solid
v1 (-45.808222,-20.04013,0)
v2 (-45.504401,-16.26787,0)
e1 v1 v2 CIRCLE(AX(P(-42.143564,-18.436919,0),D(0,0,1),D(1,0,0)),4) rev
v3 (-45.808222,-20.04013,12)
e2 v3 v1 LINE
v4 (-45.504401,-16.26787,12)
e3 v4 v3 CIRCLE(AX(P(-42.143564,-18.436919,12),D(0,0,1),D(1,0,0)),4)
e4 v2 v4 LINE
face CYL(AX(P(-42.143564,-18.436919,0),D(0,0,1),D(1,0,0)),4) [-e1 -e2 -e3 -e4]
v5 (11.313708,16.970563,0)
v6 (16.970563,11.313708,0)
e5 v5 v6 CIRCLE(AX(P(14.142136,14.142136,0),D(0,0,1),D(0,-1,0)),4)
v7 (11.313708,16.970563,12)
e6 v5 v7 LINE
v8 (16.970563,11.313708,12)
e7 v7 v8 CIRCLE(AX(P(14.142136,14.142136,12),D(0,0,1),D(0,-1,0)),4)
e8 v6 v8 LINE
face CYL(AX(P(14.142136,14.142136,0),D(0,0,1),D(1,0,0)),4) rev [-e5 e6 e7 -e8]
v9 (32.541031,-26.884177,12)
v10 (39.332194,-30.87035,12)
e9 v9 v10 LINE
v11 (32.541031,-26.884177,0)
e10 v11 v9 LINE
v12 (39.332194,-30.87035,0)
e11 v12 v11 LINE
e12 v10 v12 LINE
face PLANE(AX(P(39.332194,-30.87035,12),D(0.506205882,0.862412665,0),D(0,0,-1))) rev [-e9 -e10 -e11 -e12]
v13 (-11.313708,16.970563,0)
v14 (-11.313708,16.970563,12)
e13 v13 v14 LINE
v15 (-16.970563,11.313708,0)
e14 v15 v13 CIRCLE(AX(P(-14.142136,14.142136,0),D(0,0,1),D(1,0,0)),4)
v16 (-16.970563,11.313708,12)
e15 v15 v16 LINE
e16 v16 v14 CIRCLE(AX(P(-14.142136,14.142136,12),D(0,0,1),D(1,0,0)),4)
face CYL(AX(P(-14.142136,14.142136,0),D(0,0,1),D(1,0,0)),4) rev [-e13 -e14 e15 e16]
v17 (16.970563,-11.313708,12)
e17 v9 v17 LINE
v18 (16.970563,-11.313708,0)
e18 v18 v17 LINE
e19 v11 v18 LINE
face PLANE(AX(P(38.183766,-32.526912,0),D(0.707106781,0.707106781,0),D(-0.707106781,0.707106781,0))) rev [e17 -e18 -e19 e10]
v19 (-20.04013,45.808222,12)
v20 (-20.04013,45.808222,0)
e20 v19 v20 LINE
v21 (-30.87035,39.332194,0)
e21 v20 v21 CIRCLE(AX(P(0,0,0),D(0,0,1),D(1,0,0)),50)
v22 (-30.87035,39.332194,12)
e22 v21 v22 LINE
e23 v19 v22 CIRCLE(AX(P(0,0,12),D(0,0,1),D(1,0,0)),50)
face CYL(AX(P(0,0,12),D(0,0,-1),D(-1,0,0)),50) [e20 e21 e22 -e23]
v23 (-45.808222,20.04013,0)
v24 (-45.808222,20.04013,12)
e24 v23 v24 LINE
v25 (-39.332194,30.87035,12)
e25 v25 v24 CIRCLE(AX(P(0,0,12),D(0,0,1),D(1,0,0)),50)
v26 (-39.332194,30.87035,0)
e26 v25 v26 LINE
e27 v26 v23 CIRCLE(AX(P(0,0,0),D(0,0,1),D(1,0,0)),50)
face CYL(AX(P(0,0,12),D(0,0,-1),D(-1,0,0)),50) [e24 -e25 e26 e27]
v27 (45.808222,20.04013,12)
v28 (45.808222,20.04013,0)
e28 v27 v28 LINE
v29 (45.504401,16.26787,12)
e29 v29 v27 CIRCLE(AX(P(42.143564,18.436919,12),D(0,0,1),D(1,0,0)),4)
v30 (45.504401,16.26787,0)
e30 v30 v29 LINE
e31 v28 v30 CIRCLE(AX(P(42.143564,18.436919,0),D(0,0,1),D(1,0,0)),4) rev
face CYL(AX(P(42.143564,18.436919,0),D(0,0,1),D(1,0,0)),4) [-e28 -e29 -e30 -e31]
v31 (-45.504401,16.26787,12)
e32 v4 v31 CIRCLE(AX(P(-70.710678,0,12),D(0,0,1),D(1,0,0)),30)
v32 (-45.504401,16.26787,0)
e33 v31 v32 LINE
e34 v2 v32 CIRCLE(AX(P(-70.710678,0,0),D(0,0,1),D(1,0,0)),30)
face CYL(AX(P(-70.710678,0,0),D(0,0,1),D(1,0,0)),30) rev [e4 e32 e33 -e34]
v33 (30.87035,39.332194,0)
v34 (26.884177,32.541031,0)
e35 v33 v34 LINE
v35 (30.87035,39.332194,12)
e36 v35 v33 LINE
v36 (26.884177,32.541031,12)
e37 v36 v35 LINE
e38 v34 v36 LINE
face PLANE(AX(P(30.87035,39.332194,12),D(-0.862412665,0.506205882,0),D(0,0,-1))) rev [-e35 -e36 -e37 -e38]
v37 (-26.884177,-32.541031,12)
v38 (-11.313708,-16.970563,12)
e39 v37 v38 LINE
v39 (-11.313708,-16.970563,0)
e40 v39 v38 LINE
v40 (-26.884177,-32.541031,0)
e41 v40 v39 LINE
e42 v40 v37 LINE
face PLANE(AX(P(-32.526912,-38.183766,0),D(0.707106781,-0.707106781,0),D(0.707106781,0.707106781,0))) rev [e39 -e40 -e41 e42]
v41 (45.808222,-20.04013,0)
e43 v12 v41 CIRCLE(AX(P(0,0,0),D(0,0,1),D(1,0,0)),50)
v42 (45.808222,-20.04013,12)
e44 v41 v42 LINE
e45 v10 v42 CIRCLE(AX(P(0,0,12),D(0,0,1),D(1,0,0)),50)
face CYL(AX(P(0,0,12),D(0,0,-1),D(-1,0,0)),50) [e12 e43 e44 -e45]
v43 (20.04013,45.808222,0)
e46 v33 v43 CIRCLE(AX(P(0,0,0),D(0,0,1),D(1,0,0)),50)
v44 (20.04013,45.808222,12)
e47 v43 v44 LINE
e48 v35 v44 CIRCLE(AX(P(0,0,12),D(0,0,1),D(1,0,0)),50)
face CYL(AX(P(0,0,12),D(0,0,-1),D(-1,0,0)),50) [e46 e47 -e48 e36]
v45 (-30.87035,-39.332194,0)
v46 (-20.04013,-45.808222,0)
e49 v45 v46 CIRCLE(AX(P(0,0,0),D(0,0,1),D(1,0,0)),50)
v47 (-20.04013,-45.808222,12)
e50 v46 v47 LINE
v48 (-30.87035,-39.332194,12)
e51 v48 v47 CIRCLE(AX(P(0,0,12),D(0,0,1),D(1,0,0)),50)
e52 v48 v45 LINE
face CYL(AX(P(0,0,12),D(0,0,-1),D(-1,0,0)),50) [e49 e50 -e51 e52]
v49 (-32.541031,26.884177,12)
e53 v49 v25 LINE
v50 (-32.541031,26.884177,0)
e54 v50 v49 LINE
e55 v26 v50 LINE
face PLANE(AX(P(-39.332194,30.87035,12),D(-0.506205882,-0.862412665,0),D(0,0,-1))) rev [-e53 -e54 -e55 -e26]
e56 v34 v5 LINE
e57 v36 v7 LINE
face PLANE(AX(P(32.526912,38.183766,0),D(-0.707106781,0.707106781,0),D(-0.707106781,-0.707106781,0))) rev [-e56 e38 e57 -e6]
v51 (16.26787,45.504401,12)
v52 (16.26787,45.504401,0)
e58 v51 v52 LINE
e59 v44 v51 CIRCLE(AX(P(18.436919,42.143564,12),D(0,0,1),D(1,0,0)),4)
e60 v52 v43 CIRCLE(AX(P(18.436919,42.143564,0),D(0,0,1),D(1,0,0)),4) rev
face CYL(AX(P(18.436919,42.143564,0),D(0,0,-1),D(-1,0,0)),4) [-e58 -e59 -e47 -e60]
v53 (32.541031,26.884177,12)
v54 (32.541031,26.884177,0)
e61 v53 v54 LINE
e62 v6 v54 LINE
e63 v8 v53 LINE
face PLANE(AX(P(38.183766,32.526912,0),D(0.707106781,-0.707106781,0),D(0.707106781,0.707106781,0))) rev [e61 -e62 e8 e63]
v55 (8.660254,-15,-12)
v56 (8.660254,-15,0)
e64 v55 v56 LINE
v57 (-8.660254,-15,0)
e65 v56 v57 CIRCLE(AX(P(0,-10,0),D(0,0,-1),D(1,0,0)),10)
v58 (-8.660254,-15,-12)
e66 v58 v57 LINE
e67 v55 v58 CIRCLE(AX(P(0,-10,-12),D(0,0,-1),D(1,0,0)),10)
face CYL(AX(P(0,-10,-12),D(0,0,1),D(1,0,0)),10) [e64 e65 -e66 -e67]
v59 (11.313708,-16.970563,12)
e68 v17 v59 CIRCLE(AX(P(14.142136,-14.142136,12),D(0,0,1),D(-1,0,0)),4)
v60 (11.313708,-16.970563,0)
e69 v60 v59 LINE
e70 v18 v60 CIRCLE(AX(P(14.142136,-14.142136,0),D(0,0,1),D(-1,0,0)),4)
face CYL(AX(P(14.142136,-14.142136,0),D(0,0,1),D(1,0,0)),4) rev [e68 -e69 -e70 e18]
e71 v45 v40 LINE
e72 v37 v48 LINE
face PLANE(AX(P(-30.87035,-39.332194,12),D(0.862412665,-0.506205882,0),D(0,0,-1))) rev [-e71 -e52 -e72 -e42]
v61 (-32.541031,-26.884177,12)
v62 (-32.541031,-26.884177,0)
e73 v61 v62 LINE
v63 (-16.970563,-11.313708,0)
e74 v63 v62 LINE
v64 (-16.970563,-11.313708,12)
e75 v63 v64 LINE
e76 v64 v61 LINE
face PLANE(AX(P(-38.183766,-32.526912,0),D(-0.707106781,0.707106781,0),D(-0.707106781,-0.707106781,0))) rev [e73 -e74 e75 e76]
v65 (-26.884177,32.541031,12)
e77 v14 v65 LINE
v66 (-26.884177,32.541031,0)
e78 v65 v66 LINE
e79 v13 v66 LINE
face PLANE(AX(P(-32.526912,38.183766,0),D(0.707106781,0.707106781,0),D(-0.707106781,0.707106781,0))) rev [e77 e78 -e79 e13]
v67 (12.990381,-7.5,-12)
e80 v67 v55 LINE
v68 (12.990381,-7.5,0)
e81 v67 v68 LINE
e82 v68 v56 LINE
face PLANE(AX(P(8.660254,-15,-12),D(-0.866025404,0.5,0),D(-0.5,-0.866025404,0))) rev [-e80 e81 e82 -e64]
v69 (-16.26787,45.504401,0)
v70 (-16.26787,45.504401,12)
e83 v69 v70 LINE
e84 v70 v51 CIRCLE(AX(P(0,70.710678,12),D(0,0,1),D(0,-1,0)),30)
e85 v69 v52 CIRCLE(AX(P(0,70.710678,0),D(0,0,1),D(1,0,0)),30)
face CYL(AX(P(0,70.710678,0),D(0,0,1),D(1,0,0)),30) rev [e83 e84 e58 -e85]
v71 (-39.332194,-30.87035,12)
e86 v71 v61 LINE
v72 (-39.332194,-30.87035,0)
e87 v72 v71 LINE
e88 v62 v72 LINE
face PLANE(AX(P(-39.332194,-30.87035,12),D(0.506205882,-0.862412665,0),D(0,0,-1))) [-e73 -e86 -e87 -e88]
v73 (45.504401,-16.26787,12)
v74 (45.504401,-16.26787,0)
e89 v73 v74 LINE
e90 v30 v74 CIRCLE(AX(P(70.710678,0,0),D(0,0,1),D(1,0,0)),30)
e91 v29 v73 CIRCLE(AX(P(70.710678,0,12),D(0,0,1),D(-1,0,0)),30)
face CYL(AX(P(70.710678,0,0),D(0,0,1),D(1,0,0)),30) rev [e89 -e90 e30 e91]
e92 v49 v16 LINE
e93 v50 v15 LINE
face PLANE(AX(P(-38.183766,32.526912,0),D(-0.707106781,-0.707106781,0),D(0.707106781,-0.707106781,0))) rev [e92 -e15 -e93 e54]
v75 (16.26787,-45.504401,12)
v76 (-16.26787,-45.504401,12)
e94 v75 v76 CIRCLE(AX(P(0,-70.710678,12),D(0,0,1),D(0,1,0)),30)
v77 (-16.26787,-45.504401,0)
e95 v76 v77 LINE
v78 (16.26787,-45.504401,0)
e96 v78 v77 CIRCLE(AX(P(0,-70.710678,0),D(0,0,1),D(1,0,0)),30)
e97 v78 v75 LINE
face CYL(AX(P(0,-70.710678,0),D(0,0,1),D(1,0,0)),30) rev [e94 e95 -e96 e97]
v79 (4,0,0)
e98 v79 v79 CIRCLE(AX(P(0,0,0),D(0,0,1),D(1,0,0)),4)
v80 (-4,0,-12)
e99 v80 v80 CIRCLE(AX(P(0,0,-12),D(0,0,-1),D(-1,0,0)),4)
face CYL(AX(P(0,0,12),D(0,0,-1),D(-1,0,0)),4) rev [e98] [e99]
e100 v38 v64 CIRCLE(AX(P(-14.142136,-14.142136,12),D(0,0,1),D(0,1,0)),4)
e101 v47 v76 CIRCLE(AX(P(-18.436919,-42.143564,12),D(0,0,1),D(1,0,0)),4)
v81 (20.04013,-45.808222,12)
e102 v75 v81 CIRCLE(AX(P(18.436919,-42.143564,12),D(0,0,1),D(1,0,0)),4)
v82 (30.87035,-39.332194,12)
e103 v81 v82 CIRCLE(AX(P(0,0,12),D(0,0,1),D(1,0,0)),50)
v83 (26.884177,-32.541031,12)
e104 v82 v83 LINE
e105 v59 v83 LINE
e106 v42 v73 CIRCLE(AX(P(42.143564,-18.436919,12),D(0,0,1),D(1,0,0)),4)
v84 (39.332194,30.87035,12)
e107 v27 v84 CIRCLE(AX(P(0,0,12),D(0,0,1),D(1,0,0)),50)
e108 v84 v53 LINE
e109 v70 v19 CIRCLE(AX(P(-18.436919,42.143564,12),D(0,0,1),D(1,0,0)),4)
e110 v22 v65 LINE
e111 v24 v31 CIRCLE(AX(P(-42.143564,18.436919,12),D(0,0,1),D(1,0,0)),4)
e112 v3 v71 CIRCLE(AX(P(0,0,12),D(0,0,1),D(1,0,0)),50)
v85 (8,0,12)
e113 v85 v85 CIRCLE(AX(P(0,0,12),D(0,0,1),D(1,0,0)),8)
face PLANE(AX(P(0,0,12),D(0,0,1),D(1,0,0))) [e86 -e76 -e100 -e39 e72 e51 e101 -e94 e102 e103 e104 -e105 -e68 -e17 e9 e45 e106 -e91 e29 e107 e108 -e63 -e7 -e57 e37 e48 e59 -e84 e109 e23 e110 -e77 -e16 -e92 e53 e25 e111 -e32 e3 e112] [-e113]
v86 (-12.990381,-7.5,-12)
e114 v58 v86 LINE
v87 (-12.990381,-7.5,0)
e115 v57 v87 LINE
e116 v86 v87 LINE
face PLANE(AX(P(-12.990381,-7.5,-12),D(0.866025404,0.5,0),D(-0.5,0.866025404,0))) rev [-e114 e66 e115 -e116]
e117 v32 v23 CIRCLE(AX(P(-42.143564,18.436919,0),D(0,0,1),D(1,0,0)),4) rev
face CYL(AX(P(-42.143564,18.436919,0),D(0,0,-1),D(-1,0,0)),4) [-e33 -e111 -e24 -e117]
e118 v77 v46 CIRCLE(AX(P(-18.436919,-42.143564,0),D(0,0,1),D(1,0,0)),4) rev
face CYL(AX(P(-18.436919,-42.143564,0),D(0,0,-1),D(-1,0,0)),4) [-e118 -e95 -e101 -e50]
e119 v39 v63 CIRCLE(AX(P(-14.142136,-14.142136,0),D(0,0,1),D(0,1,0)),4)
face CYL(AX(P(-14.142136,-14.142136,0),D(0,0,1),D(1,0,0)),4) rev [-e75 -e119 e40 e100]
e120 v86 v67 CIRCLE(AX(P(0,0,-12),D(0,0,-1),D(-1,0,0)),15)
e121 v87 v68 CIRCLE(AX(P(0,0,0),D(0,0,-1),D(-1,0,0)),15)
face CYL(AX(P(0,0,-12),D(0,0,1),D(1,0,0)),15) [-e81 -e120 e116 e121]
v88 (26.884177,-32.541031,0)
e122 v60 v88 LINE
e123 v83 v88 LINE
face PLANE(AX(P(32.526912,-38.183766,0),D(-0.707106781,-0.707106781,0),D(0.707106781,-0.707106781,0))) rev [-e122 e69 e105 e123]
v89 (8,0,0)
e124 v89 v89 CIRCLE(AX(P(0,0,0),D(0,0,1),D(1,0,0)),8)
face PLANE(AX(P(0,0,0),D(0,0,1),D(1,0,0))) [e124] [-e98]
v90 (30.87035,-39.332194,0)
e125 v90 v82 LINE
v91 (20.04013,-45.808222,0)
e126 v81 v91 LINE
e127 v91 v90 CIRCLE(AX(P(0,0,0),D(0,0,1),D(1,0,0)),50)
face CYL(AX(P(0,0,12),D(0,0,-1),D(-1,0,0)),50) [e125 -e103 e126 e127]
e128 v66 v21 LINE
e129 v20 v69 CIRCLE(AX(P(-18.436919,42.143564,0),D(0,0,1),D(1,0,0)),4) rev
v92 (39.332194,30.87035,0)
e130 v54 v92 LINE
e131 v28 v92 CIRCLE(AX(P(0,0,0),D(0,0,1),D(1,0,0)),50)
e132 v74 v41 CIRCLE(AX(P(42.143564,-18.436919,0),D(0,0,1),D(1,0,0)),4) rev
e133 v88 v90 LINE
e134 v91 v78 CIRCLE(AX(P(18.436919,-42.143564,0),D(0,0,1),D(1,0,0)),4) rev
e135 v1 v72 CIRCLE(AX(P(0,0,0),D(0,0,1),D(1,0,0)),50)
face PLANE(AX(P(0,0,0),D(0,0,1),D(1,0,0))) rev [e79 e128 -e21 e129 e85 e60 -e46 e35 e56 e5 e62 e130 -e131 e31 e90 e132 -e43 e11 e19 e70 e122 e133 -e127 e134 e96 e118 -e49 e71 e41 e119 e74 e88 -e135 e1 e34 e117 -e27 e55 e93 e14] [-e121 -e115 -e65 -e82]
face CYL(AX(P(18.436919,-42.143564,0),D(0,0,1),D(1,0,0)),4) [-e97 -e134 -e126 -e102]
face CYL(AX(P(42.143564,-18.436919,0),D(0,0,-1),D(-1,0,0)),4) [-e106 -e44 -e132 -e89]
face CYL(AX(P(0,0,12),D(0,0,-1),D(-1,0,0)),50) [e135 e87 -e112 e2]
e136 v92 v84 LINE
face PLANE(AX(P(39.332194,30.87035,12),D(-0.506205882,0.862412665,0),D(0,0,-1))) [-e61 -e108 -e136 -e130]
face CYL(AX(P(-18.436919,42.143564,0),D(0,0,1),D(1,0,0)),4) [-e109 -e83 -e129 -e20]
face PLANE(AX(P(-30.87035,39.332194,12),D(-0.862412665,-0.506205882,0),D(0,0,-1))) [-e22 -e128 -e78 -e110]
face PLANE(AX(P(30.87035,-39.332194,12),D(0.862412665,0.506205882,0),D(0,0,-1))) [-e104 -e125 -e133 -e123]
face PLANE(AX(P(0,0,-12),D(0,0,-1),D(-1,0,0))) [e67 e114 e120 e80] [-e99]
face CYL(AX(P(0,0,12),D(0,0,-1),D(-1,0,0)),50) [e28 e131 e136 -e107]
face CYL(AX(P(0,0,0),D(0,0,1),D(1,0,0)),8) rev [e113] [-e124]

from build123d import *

# Parameters (mm, degrees)
SKETCH1_R           = 50
SKETCH1_R_2         = 4
BOSS_EXTRUDE1_DEPTH = 12
SKETCH2_R           = 30
CUT_EXTRUDE1_DEPTH  = 72.721684308
CUT_EXTRUDE2_DEPTH  = 72.721684308
CHAMFER1_SIZE       = 7.819775181
CIRPATTERN1_DEPTH   = 12
FILLET1_R           = 4
BOSS_EXTRUDE2_START = 12
SKETCH4_R           = 4
BOSS_EXTRUDE2_DEPTH = 12
SKETCH5_R           = 8
CUT_EXTRUDE3_DEPTH  = 12


with BuildPart() as part:
    # Sketch1 → Boss-Extrude1 (new body)
    with BuildSketch(Plane.XY):
        Circle(SKETCH1_R)
        Circle(SKETCH1_R_2, mode=Mode.SUBTRACT)
    extrude(amount=BOSS_EXTRUDE1_DEPTH)

    # Sketch2 → Cut-Extrude1 (cut, through all)
    with BuildSketch(Plane.XY.offset(12)):
        with Locations((-70.710678119, 0)):
            Circle(SKETCH2_R)
    extrude(amount=-CUT_EXTRUDE1_DEPTH, mode=Mode.SUBTRACT)

    # Sketch3 → Cut-Extrude2 (cut, through all)
    with BuildSketch(Plane.XY.offset(12)):
        with BuildLine():
            Line((-32.526911935, 38.183766184), (-11.313708499, 16.970562748))
            ThreePointArc((-11.313708499, 16.970562748), (-11.313708499, 11.313708499), (-16.970562748, 11.313708499))
            Line((-16.970562748, 11.313708499), (-38.183766184, 32.526911935))
            ThreePointArc((-38.183766184, 32.526911935), (-38.183766184, 38.183766184), (-32.526911935, 38.183766184))
        make_face()
    extrude(amount=-CUT_EXTRUDE2_DEPTH, mode=Mode.SUBTRACT)

    # Chamfer1
    # the kernel refuses this chamfer: 7.819775181, 2 mm, written as the material it takes off along each edge
    with BuildSketch(Plane(origin=(-38.070447498, 32.413593249, 32.307159288), x_dir=(-0.6329652069887249, -0.7741802417665543, 0), z_dir=(0, 0, -1))) as chamfer1_piece_1:
        with BuildLine():
            Line((1.993389554, 0), (CHAMFER1_SIZE * 0.0998541086907, -CHAMFER1_SIZE * 0.995002088869))
            Line((CHAMFER1_SIZE * 0.0998541086907, -CHAMFER1_SIZE * 0.995002088869), (0, 0))
            ThreePointArc((0, 0), (1.020707521, 0.009929226), (1.993389554, 0))
        make_face()
    extrude(amount=52.614318575, mode=Mode.SUBTRACT)
    with BuildSketch(Plane(origin=(-32.413593249, 38.070447498, 32.307159288), x_dir=(0.7741802417665462, 0.6329652069887348, 0), z_dir=(0, 0, -1))) as chamfer1_piece_2:
        with BuildLine():
            Line((1.993389554, 0), (CHAMFER1_SIZE * 0.0998541086907, CHAMFER1_SIZE * 0.995002088869))
            Line((CHAMFER1_SIZE * 0.0998541086907, CHAMFER1_SIZE * 0.995002088869), (0, 0))
            ThreePointArc((0, 0), (1.020707521, -0.009929226), (1.993389554, 0))
        make_face()
    extrude(amount=52.614318575, mode=Mode.SUBTRACT)

    # CirPattern1: read off the stored shape, not the designer's step
    # CirPattern1 outline → CirPattern1 (cut)
    with BuildSketch(Plane.XY):
        with BuildLine():
            Line((39.33219373, -30.870350442), (32.541031441, -26.884177191))
            Line((32.541031441, -26.884177191), (16.970562748, -11.313708499))
            ThreePointArc((16.970562748, -11.313708499), (11.313708499, -11.313708499), (11.313708499, -16.970562748))
            Line((11.313708499, -16.970562748), (26.884177191, -32.541031441))
            Line((26.884177191, -32.541031441), (30.870350442, -39.33219373))
            ThreePointArc((30.870350442, -39.33219373), (35.355339059, -35.355339059), (39.33219373, -30.870350442))
        make_face()
        with BuildLine():
            ThreePointArc((-17.944358445, 46.669047558), (0, 40.710678119), (17.944358445, 46.669047558))
            ThreePointArc((17.944358445, 46.669047558), (0, 50), (-17.944358445, 46.669047558))
        make_face()
        with BuildLine():
            Line((32.541031441, 26.884177191), (39.33219373, 30.870350442))
            ThreePointArc((39.33219373, 30.870350442), (35.35533906, 35.35533906), (30.870350442, 39.33219373))
            Line((30.870350442, 39.33219373), (26.884177191, 32.541031441))
            Line((26.884177191, 32.541031441), (11.313708499, 16.970562748))
            ThreePointArc((11.313708499, 16.970562748), (11.313708499, 11.313708499), (16.970562748, 11.313708499))
            Line((16.970562748, 11.313708499), (32.541031441, 26.884177191))
        make_face()
        with BuildLine():
            ThreePointArc((46.669047558, 17.944358445), (40.710678119, 0), (46.669047558, -17.944358445))
            ThreePointArc((46.669047558, -17.944358445), (50, 0), (46.669047558, 17.944358445))
        make_face()
        with BuildLine():
            ThreePointArc((-39.33219373, -30.870350442), (-35.355339059, -35.355339059), (-30.870350442, -39.332193729))
            Line((-30.870350442, -39.332193729), (-26.884177191, -32.541031441))
            Line((-26.884177191, -32.541031441), (-11.313708499, -16.970562748))
            ThreePointArc((-11.313708499, -16.970562748), (-11.313708499, -11.313708499), (-16.970562748, -11.313708499))
            Line((-16.970562748, -11.313708499), (-32.541031441, -26.884177191))
            Line((-32.541031441, -26.884177191), (-39.33219373, -30.870350442))
        make_face()
        with BuildLine():
            ThreePointArc((-17.944358445, -46.669047558), (0, -50), (17.944358445, -46.669047558))
            ThreePointArc((17.944358445, -46.669047558), (0, -40.710678119), (-17.944358445, -46.669047558))
        make_face()
    extrude(amount=CIRPATTERN1_DEPTH, mode=Mode.SUBTRACT)

    # Fillet1
    fillet1_edges = [part.edges().sort_by_distance(p)[0] for p in [
        (-46.669047558, -17.944358445, 6),
        (-46.669047558, 17.944358445, 6),
        (17.944358445, 46.669047558, 6),
        (-17.944358445, 46.669047558, 6),
        (46.669047558, -17.944358445, 6),
        (46.669047558, 17.944358445, 6),
        (-17.944358445, -46.669047558, 6),
        (17.944358445, -46.669047558, 6),
    ]]
    fillet(fillet1_edges, radius=FILLET1_R)

    # Sketch4 → Boss-Extrude2 (add)
    with BuildSketch(Plane(origin=(0, 0, 0), x_dir=(-1, 0, 0), z_dir=(0, 0, -1)).offset(BOSS_EXTRUDE2_START)):
        with BuildLine():
            Line((12.990381057, -7.5), (8.660254038, -15))
            ThreePointArc((8.660254038, -15), (0, -20), (-8.660254038, -15))
            Line((-8.660254038, -15), (-12.990381057, -7.5))
            ThreePointArc((-12.990381057, -7.5), (0, 15), (12.990381057, -7.5))
        make_face()
        Circle(SKETCH4_R, mode=Mode.SUBTRACT)
    extrude(amount=-BOSS_EXTRUDE2_DEPTH)

    # Sketch5 → Cut-Extrude3 (cut)
    with BuildSketch(Plane.XY.offset(12)):
        Circle(SKETCH5_R)
    extrude(amount=-CUT_EXTRUDE3_DEPTH, mode=Mode.SUBTRACT)


solid = part.part
